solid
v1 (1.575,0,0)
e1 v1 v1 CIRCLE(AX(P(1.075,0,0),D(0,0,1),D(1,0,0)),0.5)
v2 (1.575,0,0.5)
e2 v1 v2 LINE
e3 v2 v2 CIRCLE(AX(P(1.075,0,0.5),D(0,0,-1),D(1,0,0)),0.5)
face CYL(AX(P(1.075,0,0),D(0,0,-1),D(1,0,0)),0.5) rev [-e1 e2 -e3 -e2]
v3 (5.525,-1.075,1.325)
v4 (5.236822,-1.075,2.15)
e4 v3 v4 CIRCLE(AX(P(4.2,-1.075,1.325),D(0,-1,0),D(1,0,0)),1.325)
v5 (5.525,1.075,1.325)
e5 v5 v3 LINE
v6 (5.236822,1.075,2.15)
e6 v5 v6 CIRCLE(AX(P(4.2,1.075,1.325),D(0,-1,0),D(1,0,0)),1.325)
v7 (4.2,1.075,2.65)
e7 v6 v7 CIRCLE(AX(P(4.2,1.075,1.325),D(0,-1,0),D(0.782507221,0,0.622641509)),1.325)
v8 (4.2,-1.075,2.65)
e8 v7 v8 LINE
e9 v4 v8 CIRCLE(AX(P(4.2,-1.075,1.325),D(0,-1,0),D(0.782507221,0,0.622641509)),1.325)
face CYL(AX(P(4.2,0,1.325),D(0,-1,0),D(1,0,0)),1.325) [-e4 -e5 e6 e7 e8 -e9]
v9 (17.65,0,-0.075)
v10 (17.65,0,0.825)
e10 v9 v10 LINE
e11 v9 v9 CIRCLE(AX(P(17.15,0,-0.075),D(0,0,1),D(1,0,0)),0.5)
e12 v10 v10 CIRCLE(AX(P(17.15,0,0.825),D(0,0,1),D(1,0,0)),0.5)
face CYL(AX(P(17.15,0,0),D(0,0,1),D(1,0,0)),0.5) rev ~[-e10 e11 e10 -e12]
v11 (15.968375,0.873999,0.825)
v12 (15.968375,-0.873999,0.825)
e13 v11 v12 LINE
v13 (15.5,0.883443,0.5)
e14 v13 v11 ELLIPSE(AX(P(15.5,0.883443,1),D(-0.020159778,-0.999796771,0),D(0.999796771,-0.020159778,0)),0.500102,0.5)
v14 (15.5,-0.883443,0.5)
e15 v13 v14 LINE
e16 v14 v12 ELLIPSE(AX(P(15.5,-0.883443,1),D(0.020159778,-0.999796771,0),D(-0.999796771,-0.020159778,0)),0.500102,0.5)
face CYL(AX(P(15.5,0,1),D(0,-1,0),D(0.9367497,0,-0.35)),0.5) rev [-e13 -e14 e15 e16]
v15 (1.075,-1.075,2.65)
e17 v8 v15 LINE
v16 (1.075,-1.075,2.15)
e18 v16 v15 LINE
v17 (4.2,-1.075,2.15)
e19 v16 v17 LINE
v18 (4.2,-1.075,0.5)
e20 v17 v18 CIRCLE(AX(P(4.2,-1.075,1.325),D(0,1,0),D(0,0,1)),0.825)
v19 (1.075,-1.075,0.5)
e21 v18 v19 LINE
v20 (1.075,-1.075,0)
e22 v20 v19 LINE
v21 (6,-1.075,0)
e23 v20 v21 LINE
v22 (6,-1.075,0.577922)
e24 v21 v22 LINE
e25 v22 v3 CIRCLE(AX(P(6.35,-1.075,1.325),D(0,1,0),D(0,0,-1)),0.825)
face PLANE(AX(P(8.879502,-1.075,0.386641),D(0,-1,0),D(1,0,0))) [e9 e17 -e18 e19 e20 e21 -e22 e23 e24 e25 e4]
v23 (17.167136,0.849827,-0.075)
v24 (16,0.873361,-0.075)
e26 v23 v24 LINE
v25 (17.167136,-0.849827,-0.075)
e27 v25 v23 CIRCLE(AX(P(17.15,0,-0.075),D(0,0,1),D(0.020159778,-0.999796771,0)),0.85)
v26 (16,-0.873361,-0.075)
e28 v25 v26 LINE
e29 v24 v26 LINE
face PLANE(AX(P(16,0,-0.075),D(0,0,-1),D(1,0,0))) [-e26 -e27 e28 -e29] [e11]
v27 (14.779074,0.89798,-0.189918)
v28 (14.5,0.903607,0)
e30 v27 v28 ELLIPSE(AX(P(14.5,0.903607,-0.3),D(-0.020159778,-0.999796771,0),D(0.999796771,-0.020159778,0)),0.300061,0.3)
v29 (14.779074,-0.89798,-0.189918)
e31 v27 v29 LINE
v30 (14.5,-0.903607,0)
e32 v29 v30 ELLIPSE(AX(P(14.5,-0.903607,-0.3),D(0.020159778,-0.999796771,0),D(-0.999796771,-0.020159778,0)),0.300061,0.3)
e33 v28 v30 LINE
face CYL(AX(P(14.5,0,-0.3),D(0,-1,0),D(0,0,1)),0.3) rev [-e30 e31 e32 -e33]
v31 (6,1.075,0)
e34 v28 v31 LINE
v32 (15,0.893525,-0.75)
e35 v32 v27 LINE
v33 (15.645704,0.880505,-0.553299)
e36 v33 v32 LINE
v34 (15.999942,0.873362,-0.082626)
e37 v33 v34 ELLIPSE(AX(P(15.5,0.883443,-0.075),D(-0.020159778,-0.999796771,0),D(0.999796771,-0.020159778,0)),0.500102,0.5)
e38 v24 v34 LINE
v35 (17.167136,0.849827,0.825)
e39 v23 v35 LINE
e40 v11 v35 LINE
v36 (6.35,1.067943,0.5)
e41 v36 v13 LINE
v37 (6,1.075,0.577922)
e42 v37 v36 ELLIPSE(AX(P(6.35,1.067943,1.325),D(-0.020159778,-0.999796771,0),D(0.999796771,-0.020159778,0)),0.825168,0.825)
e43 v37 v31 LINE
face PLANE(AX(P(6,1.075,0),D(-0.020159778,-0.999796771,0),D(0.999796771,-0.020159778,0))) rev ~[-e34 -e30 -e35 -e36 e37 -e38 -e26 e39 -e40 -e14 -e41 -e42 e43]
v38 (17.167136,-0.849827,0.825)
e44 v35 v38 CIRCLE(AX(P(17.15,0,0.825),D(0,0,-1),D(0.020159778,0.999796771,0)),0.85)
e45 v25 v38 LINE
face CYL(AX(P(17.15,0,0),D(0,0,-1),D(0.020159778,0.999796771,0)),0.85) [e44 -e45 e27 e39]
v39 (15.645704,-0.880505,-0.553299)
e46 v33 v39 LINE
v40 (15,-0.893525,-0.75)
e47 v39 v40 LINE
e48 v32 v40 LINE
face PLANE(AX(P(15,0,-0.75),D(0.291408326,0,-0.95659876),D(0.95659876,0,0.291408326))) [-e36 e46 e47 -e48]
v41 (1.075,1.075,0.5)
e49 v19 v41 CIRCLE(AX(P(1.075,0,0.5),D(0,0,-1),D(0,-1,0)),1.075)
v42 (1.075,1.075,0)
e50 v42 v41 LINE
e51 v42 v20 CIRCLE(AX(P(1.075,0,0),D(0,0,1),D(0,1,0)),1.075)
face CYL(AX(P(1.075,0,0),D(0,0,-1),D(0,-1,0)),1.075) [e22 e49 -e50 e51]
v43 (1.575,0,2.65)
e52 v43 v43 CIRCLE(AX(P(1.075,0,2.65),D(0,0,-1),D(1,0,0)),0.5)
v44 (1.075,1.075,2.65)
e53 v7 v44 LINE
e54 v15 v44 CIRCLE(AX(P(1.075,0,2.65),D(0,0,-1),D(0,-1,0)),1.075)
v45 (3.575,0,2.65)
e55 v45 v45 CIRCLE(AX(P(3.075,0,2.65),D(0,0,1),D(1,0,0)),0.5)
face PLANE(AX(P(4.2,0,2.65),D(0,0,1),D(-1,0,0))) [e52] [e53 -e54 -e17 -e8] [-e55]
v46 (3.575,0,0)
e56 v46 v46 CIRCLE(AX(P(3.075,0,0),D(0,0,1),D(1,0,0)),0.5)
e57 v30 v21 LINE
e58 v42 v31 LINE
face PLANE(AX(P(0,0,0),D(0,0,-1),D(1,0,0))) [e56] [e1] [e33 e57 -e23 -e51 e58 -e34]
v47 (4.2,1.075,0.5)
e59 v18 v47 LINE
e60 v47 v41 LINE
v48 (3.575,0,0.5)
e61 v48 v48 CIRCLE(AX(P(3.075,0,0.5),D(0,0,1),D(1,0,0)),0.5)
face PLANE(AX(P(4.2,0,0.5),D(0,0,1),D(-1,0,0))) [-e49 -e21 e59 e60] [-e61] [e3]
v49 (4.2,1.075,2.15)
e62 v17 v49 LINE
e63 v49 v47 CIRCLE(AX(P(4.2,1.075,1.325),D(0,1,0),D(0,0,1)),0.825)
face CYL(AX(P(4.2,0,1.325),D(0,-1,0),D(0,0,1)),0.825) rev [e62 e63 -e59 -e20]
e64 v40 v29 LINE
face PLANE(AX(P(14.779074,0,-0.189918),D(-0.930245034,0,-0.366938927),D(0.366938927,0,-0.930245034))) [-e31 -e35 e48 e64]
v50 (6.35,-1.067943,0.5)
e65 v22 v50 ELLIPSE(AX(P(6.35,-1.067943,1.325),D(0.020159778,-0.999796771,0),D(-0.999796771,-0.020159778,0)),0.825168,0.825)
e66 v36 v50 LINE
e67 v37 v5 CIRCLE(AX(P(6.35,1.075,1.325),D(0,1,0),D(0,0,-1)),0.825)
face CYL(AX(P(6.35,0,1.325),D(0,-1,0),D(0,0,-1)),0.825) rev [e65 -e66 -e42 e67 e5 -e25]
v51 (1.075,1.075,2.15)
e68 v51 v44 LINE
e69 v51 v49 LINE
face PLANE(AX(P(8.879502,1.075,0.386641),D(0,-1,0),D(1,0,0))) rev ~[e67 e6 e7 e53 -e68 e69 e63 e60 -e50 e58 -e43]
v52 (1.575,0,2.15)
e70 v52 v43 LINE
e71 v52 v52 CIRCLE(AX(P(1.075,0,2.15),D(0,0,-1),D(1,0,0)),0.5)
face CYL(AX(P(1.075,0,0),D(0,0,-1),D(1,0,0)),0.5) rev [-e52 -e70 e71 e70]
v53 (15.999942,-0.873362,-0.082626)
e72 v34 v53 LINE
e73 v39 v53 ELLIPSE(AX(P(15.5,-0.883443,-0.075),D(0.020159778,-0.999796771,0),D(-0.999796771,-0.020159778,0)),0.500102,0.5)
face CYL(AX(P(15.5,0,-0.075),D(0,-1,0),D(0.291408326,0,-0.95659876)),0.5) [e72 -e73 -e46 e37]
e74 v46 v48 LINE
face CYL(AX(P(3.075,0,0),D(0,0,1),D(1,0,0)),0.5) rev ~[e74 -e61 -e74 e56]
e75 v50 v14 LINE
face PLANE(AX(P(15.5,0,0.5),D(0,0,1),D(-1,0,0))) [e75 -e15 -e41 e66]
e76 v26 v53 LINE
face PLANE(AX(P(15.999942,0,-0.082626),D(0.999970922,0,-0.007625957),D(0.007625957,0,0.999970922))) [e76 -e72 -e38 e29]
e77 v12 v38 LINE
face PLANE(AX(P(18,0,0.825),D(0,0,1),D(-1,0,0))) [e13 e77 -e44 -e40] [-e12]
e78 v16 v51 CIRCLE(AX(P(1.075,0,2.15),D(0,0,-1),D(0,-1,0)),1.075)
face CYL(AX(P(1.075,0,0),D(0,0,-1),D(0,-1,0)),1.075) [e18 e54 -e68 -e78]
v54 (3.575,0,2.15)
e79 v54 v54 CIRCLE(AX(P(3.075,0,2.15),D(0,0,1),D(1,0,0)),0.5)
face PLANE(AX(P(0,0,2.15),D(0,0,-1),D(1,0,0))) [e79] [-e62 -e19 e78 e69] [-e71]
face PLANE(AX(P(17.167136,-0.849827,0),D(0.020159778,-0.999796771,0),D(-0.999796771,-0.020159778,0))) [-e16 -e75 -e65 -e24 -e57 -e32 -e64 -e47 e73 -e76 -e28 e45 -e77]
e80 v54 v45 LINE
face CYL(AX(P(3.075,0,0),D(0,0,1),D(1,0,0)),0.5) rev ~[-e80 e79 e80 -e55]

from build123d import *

# Parameters (mm, degrees)
F1_DEPTH = 1.075
F2_W     = 20.9250352345
F2_H     = 5.8195129968
F2_R     = 0.5
F3_DEPTH = 12.5
F4_R     = 0.5
F5_DEPTH = 12.5


# Not quite as in the source:
# - ends of sketch curves that miss each other by under 0.0002 mm in the source are joined


with BuildPart() as f1:
    # F0 (on Front) → F1 (new body, symmetric)
    with BuildSketch(Plane.XZ):
        with BuildLine():
            Line((0, 0.5), (0, 0))
            Line((0, 0), (14.5, 0))
            ThreePointArc((14.5, 0), (14.6687831398, -0.051983364), (14.7790735103, -0.1899183219))
            Line((14.7790735103, -0.1899183219), (15, -0.75))
            Line((15, -0.75), (15.645704163, -0.55329938))
            ThreePointArc((15.645704163, -0.55329938), (15.8994973246, -0.3756690667), (15.9999418448, -0.082625733))
            Line((15.9999418448, -0.082625733), (16, -0.075))
            Line((16, -0.075), (18, -0.075))
            Line((18, -0.075), (18, 0.825))
            Line((18, 0.825), (15.9683748499, 0.825))
            ThreePointArc((15.9683748499, 0.825), (15.7850438563, 0.5892080819), (15.5, 0.5))
            Line((15.5, 0.5), (6.35, 0.5))
            ThreePointArc((6.35, 0.5), (5.7666369055, 0.7416369055), (5.525, 1.325))
            ThreePointArc((5.525, 1.325), (5.4508825364, 1.7619415066), (5.2368220677, 2.15))
            Line((5.2368220677, 2.15), (4.2, 2.15))
            ThreePointArc((4.2, 2.15), (5.025, 1.325), (4.2, 0.5))
            Line((4.2, 0.5), (0, 0.5))
        make_face()
        with BuildLine():
            Line((0, 2.15), (4.2, 2.15))
            Line((4.2, 2.15), (5.2368220677, 2.15))
            ThreePointArc((5.2368220677, 2.15), (4.7755432217, 2.5184718262), (4.2, 2.65))
            Line((4.2, 2.65), (0, 2.65))
            Line((0, 2.65), (0, 2.15))
        make_face()
    extrude(amount=F1_DEPTH, both=True)

    # F2 (on Top) → F3 (cut, symmetric)
    with BuildSketch(Plane.XY):
        with Locations((8.4883153904, -0.0547866803)):
            Rectangle(F2_W, F2_H)
        with BuildLine():
            Line((6, 1.075), (17.1671358116, 0.8498272554))
            ThreePointArc((17.1671358116, 0.8498272554), (17.7570689581, 0.5949514939), (18, 0))
            ThreePointArc((18, 0), (17.7570689581, -0.5949514939), (17.1671358116, -0.8498272554))
            Line((17.1671358116, -0.8498272554), (6, -1.075))
            Line((6, -1.075), (1.075, -1.075))
            ThreePointArc((1.075, -1.075), (0.3148602102, -0.7601397898), (0, 0))
            ThreePointArc((0, 0), (0.3148602102, 0.7601397898), (1.075, 1.075))
            Line((1.075, 1.075), (6, 1.075))
        make_face(mode=Mode.SUBTRACT)
        with Locations((1.075, 0)):
            Circle(F2_R)
        with Locations((3.075, 0)):
            Circle(F2_R)
    extrude(amount=F3_DEPTH, both=True, mode=Mode.SUBTRACT)

    # F4 (on Top) → F5 (cut, symmetric)
    with BuildSketch(Plane.XY):
        with Locations((17.15, 0)):
            Circle(F4_R)
    extrude(amount=F5_DEPTH, both=True, mode=Mode.SUBTRACT)


solid = f1.part
